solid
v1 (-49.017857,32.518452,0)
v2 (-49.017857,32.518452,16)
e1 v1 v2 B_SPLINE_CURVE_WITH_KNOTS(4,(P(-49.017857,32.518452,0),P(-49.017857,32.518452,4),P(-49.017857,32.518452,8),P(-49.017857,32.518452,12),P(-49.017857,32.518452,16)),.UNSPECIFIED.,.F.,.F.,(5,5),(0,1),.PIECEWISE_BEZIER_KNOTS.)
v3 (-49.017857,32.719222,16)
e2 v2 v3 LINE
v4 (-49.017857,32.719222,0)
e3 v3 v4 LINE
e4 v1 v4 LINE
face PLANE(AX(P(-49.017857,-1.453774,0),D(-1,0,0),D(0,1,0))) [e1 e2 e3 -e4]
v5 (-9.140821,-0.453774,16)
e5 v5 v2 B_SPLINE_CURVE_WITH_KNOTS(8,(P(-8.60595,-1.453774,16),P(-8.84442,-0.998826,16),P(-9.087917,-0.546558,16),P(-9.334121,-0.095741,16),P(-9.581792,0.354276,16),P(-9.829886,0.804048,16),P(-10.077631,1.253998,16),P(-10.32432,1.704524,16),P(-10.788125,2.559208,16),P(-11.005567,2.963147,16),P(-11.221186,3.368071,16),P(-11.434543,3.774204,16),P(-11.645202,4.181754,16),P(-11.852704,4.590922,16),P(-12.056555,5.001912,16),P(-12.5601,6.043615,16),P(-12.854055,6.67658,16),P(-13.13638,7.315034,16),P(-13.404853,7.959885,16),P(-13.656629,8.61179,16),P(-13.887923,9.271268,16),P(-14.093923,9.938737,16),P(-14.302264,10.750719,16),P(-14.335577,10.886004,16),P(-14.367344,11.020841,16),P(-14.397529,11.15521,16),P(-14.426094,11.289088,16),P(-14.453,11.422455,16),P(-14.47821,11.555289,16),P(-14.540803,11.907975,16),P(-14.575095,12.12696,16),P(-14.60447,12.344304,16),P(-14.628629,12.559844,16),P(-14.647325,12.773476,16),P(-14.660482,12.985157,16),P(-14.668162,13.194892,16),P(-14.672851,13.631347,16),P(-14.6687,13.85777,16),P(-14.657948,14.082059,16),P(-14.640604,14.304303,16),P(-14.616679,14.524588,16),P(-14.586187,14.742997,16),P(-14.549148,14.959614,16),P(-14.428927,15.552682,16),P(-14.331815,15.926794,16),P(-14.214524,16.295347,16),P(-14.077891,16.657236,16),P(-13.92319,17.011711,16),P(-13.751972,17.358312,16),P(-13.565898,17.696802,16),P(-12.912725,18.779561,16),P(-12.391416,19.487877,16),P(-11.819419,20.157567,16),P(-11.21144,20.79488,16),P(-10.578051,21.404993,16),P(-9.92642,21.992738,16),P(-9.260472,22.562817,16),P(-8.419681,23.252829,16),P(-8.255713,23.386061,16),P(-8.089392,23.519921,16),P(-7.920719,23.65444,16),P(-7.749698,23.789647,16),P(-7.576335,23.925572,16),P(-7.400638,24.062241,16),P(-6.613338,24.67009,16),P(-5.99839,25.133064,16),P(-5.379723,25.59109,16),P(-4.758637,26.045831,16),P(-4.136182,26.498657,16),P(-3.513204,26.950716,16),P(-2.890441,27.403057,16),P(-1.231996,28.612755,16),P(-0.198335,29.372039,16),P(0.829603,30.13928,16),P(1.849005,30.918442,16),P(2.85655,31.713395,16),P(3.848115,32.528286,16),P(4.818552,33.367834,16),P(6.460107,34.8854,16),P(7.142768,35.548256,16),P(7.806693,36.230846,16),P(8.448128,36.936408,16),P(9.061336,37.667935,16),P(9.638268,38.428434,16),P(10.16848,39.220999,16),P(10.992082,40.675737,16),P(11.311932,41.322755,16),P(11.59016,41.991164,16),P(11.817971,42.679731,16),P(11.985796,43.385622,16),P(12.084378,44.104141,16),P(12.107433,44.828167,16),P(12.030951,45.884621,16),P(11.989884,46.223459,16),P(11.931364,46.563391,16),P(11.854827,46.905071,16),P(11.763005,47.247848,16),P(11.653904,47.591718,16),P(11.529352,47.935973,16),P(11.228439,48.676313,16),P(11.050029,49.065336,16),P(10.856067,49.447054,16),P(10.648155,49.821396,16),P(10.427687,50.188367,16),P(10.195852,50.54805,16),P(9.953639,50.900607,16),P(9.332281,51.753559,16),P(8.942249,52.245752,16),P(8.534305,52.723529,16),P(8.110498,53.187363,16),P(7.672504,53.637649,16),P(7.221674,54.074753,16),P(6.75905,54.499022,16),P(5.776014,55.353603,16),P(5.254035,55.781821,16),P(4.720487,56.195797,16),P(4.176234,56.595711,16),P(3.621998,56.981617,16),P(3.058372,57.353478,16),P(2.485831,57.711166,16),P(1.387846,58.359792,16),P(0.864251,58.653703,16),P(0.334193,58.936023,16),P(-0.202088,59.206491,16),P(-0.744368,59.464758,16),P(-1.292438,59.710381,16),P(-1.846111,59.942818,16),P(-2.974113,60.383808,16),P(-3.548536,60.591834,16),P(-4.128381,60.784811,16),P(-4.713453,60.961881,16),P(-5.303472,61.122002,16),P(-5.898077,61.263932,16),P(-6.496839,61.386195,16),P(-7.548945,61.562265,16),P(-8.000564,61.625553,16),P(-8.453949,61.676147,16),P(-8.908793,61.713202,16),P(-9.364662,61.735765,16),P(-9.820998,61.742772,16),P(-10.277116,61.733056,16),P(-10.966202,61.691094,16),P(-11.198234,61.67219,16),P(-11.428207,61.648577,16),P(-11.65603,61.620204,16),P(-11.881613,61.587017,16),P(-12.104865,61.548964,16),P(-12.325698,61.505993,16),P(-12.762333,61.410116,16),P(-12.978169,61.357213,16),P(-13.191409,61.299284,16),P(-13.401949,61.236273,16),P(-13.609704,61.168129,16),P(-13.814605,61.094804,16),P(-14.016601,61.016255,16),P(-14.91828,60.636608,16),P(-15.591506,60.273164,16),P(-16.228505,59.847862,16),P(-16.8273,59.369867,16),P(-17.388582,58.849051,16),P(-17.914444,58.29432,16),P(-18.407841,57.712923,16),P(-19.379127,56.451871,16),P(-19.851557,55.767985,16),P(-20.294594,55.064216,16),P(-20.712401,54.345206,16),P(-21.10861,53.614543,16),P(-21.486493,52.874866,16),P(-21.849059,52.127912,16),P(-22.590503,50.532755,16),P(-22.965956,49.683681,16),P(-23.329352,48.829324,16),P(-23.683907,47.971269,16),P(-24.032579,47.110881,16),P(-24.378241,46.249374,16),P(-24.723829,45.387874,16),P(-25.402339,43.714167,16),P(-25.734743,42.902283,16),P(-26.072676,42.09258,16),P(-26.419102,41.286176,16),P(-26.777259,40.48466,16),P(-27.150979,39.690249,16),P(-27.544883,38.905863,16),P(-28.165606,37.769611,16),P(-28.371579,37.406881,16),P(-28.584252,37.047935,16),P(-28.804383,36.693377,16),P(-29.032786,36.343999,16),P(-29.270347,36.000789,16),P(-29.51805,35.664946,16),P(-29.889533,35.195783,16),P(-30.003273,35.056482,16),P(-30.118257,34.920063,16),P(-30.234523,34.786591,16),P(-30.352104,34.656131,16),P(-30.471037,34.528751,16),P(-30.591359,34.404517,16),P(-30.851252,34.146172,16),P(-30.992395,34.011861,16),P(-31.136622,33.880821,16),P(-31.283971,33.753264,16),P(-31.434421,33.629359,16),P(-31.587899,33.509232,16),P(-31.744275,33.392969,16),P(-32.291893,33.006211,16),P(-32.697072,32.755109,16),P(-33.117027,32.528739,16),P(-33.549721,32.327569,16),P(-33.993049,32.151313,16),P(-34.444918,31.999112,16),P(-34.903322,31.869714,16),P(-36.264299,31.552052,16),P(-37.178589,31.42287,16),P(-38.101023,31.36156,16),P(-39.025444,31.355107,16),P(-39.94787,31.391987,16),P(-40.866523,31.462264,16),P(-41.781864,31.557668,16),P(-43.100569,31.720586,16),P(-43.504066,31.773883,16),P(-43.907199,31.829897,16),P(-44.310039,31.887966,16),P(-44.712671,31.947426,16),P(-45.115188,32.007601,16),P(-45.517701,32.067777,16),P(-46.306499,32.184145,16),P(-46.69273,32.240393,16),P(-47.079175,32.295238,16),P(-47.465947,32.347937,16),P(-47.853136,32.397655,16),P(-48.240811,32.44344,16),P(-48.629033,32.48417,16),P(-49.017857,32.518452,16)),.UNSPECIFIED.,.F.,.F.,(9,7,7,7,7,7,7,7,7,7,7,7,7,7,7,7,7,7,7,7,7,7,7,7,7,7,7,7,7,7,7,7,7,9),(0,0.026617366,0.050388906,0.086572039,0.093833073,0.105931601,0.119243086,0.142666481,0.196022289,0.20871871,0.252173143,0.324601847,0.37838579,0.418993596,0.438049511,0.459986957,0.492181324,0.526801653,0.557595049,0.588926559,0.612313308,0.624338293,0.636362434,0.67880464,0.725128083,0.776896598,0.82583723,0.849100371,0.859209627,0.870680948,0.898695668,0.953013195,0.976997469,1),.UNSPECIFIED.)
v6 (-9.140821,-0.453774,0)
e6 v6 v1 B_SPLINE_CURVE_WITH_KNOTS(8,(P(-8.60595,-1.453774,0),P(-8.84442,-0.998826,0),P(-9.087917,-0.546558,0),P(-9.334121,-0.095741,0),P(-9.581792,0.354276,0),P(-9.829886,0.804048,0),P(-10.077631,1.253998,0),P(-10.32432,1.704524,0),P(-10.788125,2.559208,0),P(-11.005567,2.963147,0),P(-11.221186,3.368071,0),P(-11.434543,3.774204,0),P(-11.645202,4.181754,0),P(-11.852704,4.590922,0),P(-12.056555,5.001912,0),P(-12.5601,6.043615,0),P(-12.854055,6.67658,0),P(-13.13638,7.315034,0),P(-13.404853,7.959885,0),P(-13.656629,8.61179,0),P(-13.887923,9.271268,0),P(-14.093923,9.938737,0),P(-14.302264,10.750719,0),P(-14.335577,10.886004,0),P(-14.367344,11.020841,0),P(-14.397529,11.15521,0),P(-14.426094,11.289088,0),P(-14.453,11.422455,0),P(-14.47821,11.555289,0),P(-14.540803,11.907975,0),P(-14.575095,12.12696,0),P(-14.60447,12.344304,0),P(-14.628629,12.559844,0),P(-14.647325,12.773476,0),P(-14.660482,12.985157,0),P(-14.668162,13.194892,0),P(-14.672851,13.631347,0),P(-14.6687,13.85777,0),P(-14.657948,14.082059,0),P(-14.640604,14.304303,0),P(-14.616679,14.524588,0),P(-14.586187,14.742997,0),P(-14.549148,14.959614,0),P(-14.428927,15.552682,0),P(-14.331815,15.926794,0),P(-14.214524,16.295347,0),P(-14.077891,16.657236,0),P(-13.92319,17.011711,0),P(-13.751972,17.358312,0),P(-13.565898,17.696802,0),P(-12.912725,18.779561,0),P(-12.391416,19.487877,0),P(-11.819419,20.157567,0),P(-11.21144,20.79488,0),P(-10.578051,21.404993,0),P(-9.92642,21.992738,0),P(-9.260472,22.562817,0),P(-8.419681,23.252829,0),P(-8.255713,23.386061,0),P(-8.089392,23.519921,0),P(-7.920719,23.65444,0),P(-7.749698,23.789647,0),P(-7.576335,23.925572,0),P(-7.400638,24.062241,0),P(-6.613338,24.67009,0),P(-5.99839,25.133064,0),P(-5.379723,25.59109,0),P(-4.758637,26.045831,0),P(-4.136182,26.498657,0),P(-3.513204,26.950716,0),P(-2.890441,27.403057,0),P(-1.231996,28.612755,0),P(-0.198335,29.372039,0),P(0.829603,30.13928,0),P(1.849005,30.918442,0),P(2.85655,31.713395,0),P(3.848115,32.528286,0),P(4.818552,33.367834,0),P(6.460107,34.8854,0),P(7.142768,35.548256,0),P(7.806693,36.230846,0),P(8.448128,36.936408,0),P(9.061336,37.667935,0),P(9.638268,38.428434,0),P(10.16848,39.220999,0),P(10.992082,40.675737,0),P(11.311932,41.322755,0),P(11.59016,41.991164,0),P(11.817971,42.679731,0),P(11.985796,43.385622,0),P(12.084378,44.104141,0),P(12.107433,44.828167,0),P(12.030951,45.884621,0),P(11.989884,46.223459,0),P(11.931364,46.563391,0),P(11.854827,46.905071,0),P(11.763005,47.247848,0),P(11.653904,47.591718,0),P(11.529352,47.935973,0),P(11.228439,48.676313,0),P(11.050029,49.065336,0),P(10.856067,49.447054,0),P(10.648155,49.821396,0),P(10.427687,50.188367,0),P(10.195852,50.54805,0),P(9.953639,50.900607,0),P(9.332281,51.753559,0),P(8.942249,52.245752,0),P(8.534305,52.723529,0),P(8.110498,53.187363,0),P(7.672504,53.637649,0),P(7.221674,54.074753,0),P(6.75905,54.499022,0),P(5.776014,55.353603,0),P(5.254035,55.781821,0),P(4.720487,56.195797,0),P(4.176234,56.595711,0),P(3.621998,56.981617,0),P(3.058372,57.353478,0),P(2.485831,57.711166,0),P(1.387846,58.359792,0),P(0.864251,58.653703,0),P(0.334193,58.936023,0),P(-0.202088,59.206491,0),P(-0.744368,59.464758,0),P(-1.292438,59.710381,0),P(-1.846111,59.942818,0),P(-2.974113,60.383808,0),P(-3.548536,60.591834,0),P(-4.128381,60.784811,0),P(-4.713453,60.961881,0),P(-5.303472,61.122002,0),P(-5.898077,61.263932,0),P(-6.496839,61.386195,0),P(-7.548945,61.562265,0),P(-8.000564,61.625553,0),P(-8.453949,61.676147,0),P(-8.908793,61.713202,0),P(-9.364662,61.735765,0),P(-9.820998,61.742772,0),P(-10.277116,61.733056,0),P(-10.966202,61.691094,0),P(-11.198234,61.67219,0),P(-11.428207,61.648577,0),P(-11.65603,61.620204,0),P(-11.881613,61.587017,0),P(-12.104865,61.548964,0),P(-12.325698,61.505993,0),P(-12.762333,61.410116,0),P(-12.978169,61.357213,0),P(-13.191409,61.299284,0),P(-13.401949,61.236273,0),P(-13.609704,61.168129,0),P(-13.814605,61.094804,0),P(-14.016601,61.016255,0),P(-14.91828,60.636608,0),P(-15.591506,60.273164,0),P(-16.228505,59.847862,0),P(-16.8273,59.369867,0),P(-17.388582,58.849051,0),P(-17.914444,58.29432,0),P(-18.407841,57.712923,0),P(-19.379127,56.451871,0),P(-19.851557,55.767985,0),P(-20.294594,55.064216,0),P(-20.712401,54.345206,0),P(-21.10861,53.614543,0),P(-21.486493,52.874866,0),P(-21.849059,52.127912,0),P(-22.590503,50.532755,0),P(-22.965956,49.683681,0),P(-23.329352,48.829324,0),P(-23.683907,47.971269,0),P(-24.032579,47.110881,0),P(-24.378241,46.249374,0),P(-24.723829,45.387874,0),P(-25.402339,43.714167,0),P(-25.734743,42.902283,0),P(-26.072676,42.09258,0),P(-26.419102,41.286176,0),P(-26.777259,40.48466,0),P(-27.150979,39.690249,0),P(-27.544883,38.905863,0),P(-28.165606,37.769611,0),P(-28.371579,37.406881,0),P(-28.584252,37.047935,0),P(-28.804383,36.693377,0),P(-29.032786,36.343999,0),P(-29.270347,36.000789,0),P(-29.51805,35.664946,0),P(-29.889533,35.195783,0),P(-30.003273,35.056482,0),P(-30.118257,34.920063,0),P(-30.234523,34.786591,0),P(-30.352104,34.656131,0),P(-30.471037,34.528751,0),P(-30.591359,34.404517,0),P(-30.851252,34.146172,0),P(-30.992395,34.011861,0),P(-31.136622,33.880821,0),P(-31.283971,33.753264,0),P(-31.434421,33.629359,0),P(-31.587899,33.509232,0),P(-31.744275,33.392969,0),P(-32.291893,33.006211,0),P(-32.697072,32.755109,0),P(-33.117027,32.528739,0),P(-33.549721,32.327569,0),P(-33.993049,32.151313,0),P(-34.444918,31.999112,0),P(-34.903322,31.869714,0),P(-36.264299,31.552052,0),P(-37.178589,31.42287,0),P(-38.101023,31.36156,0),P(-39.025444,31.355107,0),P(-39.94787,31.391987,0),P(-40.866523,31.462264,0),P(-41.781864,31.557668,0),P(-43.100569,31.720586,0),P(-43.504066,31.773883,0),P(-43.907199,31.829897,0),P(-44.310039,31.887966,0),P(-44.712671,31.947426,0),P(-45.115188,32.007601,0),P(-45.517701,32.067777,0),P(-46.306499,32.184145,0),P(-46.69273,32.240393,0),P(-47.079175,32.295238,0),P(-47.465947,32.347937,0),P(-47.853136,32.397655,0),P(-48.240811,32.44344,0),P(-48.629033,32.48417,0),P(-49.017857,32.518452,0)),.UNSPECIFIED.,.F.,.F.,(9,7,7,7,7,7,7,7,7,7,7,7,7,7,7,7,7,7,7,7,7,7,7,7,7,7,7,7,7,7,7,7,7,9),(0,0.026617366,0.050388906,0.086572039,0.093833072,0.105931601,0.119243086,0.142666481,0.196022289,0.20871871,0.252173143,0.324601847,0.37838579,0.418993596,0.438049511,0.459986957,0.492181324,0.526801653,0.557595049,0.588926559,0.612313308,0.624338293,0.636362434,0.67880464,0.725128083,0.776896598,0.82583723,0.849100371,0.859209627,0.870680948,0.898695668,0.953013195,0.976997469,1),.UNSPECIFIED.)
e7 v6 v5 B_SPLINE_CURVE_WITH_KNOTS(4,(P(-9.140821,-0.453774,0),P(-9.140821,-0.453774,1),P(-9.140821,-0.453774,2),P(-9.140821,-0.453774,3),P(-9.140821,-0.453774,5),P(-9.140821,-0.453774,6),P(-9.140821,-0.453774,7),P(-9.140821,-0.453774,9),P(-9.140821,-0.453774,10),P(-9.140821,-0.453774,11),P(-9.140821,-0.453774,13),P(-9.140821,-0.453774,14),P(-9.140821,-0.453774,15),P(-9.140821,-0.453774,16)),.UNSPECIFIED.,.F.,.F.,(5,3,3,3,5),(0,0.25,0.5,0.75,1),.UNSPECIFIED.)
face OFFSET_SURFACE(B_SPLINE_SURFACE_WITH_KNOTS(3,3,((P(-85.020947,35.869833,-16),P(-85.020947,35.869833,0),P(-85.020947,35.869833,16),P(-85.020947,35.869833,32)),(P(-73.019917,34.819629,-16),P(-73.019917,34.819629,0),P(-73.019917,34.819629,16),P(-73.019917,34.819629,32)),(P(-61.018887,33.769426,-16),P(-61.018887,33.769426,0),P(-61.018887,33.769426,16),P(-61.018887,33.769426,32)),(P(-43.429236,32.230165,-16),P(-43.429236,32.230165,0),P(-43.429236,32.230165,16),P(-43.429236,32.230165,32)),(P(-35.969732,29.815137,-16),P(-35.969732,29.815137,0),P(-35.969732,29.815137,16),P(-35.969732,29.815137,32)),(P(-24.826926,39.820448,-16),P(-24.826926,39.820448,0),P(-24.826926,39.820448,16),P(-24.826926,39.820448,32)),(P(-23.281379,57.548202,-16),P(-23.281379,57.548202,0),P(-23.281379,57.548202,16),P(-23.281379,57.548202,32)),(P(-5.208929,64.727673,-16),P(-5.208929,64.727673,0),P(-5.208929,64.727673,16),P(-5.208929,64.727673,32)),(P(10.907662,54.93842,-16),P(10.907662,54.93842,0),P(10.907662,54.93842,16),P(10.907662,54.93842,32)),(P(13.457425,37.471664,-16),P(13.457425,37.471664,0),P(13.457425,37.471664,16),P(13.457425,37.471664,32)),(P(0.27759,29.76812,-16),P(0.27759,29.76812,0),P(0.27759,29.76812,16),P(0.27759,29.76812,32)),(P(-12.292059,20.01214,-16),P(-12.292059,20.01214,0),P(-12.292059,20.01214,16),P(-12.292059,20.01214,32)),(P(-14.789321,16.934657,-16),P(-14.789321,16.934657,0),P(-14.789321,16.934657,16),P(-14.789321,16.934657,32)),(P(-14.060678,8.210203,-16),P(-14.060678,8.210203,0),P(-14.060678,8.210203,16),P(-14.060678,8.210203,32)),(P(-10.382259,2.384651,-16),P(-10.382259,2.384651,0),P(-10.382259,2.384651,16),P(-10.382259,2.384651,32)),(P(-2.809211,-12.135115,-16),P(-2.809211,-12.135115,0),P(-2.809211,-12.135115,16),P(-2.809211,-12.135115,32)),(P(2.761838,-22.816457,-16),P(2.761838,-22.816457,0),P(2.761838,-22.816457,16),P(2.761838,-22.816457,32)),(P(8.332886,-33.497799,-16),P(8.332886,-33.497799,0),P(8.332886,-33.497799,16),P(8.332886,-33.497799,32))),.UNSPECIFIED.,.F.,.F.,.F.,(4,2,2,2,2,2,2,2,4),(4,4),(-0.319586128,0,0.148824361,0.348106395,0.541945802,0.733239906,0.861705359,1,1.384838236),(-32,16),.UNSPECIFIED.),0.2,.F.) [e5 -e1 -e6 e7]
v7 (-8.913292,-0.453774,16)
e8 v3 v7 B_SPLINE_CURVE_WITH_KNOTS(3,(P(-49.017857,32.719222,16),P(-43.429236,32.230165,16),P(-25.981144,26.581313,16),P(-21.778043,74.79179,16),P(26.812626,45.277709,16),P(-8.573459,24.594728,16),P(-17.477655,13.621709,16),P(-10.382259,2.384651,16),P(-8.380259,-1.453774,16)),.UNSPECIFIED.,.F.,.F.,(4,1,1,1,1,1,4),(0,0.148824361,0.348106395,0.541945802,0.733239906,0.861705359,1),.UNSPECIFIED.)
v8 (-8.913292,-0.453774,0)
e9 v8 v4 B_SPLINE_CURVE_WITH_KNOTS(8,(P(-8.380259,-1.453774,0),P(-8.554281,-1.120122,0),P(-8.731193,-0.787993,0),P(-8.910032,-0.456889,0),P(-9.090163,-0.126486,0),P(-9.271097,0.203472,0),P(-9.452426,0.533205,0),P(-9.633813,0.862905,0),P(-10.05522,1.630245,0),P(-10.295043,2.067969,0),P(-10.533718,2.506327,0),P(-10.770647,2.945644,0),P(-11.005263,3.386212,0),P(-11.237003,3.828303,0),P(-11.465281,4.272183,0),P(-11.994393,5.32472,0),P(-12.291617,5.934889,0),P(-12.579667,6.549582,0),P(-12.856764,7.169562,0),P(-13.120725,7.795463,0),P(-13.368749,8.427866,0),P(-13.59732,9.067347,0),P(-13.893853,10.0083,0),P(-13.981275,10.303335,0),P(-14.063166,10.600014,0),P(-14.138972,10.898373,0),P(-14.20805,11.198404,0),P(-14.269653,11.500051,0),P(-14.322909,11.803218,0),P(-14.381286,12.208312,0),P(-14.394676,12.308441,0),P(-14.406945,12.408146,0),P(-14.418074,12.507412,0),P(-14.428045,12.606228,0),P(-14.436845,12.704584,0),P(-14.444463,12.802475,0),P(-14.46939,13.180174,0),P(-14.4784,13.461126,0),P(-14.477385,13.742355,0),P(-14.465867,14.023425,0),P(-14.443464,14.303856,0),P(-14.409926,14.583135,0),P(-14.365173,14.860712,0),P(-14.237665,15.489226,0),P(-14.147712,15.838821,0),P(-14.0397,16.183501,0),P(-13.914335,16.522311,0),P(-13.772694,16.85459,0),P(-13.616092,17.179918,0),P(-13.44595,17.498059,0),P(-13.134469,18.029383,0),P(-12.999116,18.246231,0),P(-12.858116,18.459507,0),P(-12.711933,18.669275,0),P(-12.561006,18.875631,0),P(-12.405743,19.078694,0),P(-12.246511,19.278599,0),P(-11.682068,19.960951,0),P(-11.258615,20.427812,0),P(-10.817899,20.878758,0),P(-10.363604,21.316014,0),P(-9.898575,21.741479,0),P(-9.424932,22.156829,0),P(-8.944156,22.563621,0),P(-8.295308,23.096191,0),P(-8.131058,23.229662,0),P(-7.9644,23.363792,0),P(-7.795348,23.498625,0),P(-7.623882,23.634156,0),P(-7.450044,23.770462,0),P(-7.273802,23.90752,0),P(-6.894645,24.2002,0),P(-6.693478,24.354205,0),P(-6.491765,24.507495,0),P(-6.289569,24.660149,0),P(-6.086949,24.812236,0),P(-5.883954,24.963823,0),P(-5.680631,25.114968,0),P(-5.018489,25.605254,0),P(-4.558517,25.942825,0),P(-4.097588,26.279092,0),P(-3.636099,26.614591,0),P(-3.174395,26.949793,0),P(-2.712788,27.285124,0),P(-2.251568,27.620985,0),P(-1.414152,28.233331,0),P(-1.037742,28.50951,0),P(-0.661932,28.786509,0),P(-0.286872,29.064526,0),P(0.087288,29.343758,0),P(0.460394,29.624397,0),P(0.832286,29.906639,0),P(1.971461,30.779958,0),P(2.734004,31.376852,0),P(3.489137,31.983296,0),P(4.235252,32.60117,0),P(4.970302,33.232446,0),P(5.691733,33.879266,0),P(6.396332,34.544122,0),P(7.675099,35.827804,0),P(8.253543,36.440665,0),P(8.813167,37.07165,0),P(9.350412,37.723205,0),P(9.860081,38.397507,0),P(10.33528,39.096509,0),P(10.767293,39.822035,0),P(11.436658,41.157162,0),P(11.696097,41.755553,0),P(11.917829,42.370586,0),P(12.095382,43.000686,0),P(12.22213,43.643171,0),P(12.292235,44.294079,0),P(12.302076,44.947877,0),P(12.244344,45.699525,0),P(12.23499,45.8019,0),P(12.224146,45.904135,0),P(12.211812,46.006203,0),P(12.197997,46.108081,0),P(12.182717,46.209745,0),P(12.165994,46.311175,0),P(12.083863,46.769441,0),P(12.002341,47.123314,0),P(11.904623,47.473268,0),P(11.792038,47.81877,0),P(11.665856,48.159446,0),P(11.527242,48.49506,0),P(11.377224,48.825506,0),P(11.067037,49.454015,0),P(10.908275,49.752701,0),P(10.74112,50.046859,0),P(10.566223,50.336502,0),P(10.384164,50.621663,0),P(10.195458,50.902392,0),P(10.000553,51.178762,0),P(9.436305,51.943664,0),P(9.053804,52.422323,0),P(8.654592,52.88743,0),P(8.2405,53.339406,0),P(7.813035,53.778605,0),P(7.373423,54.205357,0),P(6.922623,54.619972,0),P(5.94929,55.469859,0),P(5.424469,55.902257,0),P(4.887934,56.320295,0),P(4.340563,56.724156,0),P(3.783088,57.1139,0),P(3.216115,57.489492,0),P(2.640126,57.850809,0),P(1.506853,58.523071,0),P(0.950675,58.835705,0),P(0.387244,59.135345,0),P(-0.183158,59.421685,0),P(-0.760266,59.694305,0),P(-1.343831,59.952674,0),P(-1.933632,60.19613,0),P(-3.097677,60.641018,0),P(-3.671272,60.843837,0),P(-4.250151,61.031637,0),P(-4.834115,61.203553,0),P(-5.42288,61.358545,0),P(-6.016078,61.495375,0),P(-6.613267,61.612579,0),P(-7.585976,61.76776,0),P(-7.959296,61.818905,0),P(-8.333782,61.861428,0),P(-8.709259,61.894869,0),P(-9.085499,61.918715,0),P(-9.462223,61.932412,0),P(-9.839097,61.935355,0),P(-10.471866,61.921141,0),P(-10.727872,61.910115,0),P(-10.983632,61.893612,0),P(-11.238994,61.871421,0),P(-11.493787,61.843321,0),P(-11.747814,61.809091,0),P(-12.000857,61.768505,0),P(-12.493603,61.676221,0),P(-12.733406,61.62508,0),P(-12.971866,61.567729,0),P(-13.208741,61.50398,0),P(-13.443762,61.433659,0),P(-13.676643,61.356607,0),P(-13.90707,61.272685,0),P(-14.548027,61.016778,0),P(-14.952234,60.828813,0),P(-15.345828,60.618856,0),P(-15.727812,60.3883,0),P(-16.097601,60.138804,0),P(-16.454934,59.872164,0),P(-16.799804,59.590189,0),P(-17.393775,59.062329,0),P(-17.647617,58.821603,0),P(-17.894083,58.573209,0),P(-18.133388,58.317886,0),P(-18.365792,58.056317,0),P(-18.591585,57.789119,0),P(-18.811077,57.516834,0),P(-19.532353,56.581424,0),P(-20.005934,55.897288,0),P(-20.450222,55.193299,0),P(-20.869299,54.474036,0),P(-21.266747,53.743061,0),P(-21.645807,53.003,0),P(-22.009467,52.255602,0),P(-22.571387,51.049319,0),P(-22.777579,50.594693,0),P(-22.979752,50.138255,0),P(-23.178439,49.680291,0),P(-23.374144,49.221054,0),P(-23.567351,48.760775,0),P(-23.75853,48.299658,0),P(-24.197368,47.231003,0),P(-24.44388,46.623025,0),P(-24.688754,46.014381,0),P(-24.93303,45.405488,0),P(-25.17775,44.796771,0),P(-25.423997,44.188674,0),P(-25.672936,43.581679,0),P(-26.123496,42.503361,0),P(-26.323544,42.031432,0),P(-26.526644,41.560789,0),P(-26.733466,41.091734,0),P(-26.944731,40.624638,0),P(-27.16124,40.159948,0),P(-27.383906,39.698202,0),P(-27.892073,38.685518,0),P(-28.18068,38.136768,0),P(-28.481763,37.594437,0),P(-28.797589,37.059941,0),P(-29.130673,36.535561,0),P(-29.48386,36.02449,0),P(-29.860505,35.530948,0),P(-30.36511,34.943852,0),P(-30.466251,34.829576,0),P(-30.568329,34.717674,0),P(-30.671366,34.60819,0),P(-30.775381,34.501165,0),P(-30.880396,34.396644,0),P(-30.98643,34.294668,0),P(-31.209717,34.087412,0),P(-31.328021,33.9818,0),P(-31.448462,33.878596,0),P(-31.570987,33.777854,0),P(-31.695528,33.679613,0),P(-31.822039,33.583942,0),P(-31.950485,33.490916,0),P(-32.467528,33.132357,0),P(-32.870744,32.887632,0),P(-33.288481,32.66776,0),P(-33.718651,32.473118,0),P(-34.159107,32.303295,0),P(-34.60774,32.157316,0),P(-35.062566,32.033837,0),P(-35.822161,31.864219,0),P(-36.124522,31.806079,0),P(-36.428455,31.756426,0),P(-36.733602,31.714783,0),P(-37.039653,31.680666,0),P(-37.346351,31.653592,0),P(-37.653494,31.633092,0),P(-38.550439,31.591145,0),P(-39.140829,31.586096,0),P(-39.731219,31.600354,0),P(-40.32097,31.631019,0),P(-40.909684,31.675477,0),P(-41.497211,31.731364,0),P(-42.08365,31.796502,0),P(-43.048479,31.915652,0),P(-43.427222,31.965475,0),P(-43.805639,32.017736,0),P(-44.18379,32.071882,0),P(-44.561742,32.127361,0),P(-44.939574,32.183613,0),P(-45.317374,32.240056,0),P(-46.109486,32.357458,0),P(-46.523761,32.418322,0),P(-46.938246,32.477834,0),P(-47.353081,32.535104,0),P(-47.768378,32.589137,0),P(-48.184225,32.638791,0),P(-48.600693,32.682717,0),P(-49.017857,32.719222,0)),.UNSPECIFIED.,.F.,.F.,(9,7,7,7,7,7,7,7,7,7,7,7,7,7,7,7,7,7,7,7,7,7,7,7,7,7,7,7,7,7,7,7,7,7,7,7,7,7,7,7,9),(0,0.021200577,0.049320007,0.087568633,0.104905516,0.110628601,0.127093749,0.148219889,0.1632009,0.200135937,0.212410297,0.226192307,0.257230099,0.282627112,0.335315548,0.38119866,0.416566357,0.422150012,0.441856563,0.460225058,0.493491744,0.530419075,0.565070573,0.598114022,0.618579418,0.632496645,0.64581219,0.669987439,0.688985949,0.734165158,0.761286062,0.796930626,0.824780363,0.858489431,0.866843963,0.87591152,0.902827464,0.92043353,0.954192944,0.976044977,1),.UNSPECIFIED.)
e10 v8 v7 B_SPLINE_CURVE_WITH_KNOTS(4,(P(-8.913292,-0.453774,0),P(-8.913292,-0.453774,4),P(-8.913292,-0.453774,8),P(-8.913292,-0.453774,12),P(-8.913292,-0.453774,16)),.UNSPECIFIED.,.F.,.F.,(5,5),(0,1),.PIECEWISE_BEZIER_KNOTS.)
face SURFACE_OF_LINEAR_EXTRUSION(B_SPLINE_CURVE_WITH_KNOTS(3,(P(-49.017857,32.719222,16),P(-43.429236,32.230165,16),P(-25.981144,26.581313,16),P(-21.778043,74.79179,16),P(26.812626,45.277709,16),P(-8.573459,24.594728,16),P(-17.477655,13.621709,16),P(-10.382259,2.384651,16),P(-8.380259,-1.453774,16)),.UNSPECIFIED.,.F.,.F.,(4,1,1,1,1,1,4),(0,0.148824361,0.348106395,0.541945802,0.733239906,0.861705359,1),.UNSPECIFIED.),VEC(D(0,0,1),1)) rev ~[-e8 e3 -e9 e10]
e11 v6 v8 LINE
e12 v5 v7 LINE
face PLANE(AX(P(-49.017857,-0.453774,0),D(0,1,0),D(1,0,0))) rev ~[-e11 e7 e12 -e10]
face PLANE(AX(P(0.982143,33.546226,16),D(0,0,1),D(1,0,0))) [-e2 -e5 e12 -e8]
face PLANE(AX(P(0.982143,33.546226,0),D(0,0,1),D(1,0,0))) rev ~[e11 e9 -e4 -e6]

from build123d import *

# Parameters (mm, degrees)
F0_W     = 100
F0_H     = 70
F1_DEPTH = 16
F3_DEPTH = 25
F4_T     = -0.2
F5_DEPTH = 1


# Not quite as in the source:
# - a feature names something its author has since deleted; it is built from what else it names


with BuildPart() as f1:
    # F0 (on Top) → F1 (new body)
    with BuildSketch(Plane.XY):
        with Locations((0.9821429849, 33.5462264796)):
            Rectangle(F0_W, F0_H)
    extrude(amount=F1_DEPTH)

    # F2 (on face) → F3 (cut)
    with BuildSketch(Plane.XY.offset(16)):
        with BuildLine():
            Line((-49.0178570151, 68.5462264796), (-49.0178570151, 32.7192223562))
            add(Edge.make_bspline(
                [(-49.0178570151, 32.7192223562), (-43.4292364383, 32.2301652848), (-25.9811441186, 26.5813131518), (-21.7780426464, 74.7917895904), (26.8126262734, 45.2777093392), (-8.5734588785, 24.5947279779), (-17.4776549017, 13.6217093611), (-10.3822594237, 2.3846505635), (-8.3802593872, -1.4537735204)],
                knots=[0, 0, 0, 0, 0.1488243606, 0.3481063954, 0.5419458019, 0.7332399063, 0.8617053586, 1, 1, 1, 1], degree=3))
            Line((-8.3802593872, -1.4537735204), (50.9821429849, -1.4537735204))
            Line((50.9821429849, -1.4537735204), (50.9821429849, 68.5462264796))
            Line((50.9821429849, 68.5462264796), (-49.0178570151, 68.5462264796))
        make_face()
    extrude(amount=-F3_DEPTH, mode=Mode.SUBTRACT)

    # F4
    f4_openings = [f1.faces().sort_by_distance(p)[0] for p in [
        (-20.309609, 28.197223, 16),
        (-20.315883, 28.187702, 0),
        (-49.017857, 15.632724, 8),
    ]]
    offset(amount=F4_T, openings=f4_openings, kind=Kind.INTERSECTION)

    # F5 (cut): a face of the model
    f5_faces = [f1.faces().sort_by_distance(p)[0] for p in [
        (-28.6990582012, -1.4537735204, 8),
    ]]
    extrude(f5_faces, amount=-F5_DEPTH, mode=Mode.SUBTRACT)


solid = f1.part
